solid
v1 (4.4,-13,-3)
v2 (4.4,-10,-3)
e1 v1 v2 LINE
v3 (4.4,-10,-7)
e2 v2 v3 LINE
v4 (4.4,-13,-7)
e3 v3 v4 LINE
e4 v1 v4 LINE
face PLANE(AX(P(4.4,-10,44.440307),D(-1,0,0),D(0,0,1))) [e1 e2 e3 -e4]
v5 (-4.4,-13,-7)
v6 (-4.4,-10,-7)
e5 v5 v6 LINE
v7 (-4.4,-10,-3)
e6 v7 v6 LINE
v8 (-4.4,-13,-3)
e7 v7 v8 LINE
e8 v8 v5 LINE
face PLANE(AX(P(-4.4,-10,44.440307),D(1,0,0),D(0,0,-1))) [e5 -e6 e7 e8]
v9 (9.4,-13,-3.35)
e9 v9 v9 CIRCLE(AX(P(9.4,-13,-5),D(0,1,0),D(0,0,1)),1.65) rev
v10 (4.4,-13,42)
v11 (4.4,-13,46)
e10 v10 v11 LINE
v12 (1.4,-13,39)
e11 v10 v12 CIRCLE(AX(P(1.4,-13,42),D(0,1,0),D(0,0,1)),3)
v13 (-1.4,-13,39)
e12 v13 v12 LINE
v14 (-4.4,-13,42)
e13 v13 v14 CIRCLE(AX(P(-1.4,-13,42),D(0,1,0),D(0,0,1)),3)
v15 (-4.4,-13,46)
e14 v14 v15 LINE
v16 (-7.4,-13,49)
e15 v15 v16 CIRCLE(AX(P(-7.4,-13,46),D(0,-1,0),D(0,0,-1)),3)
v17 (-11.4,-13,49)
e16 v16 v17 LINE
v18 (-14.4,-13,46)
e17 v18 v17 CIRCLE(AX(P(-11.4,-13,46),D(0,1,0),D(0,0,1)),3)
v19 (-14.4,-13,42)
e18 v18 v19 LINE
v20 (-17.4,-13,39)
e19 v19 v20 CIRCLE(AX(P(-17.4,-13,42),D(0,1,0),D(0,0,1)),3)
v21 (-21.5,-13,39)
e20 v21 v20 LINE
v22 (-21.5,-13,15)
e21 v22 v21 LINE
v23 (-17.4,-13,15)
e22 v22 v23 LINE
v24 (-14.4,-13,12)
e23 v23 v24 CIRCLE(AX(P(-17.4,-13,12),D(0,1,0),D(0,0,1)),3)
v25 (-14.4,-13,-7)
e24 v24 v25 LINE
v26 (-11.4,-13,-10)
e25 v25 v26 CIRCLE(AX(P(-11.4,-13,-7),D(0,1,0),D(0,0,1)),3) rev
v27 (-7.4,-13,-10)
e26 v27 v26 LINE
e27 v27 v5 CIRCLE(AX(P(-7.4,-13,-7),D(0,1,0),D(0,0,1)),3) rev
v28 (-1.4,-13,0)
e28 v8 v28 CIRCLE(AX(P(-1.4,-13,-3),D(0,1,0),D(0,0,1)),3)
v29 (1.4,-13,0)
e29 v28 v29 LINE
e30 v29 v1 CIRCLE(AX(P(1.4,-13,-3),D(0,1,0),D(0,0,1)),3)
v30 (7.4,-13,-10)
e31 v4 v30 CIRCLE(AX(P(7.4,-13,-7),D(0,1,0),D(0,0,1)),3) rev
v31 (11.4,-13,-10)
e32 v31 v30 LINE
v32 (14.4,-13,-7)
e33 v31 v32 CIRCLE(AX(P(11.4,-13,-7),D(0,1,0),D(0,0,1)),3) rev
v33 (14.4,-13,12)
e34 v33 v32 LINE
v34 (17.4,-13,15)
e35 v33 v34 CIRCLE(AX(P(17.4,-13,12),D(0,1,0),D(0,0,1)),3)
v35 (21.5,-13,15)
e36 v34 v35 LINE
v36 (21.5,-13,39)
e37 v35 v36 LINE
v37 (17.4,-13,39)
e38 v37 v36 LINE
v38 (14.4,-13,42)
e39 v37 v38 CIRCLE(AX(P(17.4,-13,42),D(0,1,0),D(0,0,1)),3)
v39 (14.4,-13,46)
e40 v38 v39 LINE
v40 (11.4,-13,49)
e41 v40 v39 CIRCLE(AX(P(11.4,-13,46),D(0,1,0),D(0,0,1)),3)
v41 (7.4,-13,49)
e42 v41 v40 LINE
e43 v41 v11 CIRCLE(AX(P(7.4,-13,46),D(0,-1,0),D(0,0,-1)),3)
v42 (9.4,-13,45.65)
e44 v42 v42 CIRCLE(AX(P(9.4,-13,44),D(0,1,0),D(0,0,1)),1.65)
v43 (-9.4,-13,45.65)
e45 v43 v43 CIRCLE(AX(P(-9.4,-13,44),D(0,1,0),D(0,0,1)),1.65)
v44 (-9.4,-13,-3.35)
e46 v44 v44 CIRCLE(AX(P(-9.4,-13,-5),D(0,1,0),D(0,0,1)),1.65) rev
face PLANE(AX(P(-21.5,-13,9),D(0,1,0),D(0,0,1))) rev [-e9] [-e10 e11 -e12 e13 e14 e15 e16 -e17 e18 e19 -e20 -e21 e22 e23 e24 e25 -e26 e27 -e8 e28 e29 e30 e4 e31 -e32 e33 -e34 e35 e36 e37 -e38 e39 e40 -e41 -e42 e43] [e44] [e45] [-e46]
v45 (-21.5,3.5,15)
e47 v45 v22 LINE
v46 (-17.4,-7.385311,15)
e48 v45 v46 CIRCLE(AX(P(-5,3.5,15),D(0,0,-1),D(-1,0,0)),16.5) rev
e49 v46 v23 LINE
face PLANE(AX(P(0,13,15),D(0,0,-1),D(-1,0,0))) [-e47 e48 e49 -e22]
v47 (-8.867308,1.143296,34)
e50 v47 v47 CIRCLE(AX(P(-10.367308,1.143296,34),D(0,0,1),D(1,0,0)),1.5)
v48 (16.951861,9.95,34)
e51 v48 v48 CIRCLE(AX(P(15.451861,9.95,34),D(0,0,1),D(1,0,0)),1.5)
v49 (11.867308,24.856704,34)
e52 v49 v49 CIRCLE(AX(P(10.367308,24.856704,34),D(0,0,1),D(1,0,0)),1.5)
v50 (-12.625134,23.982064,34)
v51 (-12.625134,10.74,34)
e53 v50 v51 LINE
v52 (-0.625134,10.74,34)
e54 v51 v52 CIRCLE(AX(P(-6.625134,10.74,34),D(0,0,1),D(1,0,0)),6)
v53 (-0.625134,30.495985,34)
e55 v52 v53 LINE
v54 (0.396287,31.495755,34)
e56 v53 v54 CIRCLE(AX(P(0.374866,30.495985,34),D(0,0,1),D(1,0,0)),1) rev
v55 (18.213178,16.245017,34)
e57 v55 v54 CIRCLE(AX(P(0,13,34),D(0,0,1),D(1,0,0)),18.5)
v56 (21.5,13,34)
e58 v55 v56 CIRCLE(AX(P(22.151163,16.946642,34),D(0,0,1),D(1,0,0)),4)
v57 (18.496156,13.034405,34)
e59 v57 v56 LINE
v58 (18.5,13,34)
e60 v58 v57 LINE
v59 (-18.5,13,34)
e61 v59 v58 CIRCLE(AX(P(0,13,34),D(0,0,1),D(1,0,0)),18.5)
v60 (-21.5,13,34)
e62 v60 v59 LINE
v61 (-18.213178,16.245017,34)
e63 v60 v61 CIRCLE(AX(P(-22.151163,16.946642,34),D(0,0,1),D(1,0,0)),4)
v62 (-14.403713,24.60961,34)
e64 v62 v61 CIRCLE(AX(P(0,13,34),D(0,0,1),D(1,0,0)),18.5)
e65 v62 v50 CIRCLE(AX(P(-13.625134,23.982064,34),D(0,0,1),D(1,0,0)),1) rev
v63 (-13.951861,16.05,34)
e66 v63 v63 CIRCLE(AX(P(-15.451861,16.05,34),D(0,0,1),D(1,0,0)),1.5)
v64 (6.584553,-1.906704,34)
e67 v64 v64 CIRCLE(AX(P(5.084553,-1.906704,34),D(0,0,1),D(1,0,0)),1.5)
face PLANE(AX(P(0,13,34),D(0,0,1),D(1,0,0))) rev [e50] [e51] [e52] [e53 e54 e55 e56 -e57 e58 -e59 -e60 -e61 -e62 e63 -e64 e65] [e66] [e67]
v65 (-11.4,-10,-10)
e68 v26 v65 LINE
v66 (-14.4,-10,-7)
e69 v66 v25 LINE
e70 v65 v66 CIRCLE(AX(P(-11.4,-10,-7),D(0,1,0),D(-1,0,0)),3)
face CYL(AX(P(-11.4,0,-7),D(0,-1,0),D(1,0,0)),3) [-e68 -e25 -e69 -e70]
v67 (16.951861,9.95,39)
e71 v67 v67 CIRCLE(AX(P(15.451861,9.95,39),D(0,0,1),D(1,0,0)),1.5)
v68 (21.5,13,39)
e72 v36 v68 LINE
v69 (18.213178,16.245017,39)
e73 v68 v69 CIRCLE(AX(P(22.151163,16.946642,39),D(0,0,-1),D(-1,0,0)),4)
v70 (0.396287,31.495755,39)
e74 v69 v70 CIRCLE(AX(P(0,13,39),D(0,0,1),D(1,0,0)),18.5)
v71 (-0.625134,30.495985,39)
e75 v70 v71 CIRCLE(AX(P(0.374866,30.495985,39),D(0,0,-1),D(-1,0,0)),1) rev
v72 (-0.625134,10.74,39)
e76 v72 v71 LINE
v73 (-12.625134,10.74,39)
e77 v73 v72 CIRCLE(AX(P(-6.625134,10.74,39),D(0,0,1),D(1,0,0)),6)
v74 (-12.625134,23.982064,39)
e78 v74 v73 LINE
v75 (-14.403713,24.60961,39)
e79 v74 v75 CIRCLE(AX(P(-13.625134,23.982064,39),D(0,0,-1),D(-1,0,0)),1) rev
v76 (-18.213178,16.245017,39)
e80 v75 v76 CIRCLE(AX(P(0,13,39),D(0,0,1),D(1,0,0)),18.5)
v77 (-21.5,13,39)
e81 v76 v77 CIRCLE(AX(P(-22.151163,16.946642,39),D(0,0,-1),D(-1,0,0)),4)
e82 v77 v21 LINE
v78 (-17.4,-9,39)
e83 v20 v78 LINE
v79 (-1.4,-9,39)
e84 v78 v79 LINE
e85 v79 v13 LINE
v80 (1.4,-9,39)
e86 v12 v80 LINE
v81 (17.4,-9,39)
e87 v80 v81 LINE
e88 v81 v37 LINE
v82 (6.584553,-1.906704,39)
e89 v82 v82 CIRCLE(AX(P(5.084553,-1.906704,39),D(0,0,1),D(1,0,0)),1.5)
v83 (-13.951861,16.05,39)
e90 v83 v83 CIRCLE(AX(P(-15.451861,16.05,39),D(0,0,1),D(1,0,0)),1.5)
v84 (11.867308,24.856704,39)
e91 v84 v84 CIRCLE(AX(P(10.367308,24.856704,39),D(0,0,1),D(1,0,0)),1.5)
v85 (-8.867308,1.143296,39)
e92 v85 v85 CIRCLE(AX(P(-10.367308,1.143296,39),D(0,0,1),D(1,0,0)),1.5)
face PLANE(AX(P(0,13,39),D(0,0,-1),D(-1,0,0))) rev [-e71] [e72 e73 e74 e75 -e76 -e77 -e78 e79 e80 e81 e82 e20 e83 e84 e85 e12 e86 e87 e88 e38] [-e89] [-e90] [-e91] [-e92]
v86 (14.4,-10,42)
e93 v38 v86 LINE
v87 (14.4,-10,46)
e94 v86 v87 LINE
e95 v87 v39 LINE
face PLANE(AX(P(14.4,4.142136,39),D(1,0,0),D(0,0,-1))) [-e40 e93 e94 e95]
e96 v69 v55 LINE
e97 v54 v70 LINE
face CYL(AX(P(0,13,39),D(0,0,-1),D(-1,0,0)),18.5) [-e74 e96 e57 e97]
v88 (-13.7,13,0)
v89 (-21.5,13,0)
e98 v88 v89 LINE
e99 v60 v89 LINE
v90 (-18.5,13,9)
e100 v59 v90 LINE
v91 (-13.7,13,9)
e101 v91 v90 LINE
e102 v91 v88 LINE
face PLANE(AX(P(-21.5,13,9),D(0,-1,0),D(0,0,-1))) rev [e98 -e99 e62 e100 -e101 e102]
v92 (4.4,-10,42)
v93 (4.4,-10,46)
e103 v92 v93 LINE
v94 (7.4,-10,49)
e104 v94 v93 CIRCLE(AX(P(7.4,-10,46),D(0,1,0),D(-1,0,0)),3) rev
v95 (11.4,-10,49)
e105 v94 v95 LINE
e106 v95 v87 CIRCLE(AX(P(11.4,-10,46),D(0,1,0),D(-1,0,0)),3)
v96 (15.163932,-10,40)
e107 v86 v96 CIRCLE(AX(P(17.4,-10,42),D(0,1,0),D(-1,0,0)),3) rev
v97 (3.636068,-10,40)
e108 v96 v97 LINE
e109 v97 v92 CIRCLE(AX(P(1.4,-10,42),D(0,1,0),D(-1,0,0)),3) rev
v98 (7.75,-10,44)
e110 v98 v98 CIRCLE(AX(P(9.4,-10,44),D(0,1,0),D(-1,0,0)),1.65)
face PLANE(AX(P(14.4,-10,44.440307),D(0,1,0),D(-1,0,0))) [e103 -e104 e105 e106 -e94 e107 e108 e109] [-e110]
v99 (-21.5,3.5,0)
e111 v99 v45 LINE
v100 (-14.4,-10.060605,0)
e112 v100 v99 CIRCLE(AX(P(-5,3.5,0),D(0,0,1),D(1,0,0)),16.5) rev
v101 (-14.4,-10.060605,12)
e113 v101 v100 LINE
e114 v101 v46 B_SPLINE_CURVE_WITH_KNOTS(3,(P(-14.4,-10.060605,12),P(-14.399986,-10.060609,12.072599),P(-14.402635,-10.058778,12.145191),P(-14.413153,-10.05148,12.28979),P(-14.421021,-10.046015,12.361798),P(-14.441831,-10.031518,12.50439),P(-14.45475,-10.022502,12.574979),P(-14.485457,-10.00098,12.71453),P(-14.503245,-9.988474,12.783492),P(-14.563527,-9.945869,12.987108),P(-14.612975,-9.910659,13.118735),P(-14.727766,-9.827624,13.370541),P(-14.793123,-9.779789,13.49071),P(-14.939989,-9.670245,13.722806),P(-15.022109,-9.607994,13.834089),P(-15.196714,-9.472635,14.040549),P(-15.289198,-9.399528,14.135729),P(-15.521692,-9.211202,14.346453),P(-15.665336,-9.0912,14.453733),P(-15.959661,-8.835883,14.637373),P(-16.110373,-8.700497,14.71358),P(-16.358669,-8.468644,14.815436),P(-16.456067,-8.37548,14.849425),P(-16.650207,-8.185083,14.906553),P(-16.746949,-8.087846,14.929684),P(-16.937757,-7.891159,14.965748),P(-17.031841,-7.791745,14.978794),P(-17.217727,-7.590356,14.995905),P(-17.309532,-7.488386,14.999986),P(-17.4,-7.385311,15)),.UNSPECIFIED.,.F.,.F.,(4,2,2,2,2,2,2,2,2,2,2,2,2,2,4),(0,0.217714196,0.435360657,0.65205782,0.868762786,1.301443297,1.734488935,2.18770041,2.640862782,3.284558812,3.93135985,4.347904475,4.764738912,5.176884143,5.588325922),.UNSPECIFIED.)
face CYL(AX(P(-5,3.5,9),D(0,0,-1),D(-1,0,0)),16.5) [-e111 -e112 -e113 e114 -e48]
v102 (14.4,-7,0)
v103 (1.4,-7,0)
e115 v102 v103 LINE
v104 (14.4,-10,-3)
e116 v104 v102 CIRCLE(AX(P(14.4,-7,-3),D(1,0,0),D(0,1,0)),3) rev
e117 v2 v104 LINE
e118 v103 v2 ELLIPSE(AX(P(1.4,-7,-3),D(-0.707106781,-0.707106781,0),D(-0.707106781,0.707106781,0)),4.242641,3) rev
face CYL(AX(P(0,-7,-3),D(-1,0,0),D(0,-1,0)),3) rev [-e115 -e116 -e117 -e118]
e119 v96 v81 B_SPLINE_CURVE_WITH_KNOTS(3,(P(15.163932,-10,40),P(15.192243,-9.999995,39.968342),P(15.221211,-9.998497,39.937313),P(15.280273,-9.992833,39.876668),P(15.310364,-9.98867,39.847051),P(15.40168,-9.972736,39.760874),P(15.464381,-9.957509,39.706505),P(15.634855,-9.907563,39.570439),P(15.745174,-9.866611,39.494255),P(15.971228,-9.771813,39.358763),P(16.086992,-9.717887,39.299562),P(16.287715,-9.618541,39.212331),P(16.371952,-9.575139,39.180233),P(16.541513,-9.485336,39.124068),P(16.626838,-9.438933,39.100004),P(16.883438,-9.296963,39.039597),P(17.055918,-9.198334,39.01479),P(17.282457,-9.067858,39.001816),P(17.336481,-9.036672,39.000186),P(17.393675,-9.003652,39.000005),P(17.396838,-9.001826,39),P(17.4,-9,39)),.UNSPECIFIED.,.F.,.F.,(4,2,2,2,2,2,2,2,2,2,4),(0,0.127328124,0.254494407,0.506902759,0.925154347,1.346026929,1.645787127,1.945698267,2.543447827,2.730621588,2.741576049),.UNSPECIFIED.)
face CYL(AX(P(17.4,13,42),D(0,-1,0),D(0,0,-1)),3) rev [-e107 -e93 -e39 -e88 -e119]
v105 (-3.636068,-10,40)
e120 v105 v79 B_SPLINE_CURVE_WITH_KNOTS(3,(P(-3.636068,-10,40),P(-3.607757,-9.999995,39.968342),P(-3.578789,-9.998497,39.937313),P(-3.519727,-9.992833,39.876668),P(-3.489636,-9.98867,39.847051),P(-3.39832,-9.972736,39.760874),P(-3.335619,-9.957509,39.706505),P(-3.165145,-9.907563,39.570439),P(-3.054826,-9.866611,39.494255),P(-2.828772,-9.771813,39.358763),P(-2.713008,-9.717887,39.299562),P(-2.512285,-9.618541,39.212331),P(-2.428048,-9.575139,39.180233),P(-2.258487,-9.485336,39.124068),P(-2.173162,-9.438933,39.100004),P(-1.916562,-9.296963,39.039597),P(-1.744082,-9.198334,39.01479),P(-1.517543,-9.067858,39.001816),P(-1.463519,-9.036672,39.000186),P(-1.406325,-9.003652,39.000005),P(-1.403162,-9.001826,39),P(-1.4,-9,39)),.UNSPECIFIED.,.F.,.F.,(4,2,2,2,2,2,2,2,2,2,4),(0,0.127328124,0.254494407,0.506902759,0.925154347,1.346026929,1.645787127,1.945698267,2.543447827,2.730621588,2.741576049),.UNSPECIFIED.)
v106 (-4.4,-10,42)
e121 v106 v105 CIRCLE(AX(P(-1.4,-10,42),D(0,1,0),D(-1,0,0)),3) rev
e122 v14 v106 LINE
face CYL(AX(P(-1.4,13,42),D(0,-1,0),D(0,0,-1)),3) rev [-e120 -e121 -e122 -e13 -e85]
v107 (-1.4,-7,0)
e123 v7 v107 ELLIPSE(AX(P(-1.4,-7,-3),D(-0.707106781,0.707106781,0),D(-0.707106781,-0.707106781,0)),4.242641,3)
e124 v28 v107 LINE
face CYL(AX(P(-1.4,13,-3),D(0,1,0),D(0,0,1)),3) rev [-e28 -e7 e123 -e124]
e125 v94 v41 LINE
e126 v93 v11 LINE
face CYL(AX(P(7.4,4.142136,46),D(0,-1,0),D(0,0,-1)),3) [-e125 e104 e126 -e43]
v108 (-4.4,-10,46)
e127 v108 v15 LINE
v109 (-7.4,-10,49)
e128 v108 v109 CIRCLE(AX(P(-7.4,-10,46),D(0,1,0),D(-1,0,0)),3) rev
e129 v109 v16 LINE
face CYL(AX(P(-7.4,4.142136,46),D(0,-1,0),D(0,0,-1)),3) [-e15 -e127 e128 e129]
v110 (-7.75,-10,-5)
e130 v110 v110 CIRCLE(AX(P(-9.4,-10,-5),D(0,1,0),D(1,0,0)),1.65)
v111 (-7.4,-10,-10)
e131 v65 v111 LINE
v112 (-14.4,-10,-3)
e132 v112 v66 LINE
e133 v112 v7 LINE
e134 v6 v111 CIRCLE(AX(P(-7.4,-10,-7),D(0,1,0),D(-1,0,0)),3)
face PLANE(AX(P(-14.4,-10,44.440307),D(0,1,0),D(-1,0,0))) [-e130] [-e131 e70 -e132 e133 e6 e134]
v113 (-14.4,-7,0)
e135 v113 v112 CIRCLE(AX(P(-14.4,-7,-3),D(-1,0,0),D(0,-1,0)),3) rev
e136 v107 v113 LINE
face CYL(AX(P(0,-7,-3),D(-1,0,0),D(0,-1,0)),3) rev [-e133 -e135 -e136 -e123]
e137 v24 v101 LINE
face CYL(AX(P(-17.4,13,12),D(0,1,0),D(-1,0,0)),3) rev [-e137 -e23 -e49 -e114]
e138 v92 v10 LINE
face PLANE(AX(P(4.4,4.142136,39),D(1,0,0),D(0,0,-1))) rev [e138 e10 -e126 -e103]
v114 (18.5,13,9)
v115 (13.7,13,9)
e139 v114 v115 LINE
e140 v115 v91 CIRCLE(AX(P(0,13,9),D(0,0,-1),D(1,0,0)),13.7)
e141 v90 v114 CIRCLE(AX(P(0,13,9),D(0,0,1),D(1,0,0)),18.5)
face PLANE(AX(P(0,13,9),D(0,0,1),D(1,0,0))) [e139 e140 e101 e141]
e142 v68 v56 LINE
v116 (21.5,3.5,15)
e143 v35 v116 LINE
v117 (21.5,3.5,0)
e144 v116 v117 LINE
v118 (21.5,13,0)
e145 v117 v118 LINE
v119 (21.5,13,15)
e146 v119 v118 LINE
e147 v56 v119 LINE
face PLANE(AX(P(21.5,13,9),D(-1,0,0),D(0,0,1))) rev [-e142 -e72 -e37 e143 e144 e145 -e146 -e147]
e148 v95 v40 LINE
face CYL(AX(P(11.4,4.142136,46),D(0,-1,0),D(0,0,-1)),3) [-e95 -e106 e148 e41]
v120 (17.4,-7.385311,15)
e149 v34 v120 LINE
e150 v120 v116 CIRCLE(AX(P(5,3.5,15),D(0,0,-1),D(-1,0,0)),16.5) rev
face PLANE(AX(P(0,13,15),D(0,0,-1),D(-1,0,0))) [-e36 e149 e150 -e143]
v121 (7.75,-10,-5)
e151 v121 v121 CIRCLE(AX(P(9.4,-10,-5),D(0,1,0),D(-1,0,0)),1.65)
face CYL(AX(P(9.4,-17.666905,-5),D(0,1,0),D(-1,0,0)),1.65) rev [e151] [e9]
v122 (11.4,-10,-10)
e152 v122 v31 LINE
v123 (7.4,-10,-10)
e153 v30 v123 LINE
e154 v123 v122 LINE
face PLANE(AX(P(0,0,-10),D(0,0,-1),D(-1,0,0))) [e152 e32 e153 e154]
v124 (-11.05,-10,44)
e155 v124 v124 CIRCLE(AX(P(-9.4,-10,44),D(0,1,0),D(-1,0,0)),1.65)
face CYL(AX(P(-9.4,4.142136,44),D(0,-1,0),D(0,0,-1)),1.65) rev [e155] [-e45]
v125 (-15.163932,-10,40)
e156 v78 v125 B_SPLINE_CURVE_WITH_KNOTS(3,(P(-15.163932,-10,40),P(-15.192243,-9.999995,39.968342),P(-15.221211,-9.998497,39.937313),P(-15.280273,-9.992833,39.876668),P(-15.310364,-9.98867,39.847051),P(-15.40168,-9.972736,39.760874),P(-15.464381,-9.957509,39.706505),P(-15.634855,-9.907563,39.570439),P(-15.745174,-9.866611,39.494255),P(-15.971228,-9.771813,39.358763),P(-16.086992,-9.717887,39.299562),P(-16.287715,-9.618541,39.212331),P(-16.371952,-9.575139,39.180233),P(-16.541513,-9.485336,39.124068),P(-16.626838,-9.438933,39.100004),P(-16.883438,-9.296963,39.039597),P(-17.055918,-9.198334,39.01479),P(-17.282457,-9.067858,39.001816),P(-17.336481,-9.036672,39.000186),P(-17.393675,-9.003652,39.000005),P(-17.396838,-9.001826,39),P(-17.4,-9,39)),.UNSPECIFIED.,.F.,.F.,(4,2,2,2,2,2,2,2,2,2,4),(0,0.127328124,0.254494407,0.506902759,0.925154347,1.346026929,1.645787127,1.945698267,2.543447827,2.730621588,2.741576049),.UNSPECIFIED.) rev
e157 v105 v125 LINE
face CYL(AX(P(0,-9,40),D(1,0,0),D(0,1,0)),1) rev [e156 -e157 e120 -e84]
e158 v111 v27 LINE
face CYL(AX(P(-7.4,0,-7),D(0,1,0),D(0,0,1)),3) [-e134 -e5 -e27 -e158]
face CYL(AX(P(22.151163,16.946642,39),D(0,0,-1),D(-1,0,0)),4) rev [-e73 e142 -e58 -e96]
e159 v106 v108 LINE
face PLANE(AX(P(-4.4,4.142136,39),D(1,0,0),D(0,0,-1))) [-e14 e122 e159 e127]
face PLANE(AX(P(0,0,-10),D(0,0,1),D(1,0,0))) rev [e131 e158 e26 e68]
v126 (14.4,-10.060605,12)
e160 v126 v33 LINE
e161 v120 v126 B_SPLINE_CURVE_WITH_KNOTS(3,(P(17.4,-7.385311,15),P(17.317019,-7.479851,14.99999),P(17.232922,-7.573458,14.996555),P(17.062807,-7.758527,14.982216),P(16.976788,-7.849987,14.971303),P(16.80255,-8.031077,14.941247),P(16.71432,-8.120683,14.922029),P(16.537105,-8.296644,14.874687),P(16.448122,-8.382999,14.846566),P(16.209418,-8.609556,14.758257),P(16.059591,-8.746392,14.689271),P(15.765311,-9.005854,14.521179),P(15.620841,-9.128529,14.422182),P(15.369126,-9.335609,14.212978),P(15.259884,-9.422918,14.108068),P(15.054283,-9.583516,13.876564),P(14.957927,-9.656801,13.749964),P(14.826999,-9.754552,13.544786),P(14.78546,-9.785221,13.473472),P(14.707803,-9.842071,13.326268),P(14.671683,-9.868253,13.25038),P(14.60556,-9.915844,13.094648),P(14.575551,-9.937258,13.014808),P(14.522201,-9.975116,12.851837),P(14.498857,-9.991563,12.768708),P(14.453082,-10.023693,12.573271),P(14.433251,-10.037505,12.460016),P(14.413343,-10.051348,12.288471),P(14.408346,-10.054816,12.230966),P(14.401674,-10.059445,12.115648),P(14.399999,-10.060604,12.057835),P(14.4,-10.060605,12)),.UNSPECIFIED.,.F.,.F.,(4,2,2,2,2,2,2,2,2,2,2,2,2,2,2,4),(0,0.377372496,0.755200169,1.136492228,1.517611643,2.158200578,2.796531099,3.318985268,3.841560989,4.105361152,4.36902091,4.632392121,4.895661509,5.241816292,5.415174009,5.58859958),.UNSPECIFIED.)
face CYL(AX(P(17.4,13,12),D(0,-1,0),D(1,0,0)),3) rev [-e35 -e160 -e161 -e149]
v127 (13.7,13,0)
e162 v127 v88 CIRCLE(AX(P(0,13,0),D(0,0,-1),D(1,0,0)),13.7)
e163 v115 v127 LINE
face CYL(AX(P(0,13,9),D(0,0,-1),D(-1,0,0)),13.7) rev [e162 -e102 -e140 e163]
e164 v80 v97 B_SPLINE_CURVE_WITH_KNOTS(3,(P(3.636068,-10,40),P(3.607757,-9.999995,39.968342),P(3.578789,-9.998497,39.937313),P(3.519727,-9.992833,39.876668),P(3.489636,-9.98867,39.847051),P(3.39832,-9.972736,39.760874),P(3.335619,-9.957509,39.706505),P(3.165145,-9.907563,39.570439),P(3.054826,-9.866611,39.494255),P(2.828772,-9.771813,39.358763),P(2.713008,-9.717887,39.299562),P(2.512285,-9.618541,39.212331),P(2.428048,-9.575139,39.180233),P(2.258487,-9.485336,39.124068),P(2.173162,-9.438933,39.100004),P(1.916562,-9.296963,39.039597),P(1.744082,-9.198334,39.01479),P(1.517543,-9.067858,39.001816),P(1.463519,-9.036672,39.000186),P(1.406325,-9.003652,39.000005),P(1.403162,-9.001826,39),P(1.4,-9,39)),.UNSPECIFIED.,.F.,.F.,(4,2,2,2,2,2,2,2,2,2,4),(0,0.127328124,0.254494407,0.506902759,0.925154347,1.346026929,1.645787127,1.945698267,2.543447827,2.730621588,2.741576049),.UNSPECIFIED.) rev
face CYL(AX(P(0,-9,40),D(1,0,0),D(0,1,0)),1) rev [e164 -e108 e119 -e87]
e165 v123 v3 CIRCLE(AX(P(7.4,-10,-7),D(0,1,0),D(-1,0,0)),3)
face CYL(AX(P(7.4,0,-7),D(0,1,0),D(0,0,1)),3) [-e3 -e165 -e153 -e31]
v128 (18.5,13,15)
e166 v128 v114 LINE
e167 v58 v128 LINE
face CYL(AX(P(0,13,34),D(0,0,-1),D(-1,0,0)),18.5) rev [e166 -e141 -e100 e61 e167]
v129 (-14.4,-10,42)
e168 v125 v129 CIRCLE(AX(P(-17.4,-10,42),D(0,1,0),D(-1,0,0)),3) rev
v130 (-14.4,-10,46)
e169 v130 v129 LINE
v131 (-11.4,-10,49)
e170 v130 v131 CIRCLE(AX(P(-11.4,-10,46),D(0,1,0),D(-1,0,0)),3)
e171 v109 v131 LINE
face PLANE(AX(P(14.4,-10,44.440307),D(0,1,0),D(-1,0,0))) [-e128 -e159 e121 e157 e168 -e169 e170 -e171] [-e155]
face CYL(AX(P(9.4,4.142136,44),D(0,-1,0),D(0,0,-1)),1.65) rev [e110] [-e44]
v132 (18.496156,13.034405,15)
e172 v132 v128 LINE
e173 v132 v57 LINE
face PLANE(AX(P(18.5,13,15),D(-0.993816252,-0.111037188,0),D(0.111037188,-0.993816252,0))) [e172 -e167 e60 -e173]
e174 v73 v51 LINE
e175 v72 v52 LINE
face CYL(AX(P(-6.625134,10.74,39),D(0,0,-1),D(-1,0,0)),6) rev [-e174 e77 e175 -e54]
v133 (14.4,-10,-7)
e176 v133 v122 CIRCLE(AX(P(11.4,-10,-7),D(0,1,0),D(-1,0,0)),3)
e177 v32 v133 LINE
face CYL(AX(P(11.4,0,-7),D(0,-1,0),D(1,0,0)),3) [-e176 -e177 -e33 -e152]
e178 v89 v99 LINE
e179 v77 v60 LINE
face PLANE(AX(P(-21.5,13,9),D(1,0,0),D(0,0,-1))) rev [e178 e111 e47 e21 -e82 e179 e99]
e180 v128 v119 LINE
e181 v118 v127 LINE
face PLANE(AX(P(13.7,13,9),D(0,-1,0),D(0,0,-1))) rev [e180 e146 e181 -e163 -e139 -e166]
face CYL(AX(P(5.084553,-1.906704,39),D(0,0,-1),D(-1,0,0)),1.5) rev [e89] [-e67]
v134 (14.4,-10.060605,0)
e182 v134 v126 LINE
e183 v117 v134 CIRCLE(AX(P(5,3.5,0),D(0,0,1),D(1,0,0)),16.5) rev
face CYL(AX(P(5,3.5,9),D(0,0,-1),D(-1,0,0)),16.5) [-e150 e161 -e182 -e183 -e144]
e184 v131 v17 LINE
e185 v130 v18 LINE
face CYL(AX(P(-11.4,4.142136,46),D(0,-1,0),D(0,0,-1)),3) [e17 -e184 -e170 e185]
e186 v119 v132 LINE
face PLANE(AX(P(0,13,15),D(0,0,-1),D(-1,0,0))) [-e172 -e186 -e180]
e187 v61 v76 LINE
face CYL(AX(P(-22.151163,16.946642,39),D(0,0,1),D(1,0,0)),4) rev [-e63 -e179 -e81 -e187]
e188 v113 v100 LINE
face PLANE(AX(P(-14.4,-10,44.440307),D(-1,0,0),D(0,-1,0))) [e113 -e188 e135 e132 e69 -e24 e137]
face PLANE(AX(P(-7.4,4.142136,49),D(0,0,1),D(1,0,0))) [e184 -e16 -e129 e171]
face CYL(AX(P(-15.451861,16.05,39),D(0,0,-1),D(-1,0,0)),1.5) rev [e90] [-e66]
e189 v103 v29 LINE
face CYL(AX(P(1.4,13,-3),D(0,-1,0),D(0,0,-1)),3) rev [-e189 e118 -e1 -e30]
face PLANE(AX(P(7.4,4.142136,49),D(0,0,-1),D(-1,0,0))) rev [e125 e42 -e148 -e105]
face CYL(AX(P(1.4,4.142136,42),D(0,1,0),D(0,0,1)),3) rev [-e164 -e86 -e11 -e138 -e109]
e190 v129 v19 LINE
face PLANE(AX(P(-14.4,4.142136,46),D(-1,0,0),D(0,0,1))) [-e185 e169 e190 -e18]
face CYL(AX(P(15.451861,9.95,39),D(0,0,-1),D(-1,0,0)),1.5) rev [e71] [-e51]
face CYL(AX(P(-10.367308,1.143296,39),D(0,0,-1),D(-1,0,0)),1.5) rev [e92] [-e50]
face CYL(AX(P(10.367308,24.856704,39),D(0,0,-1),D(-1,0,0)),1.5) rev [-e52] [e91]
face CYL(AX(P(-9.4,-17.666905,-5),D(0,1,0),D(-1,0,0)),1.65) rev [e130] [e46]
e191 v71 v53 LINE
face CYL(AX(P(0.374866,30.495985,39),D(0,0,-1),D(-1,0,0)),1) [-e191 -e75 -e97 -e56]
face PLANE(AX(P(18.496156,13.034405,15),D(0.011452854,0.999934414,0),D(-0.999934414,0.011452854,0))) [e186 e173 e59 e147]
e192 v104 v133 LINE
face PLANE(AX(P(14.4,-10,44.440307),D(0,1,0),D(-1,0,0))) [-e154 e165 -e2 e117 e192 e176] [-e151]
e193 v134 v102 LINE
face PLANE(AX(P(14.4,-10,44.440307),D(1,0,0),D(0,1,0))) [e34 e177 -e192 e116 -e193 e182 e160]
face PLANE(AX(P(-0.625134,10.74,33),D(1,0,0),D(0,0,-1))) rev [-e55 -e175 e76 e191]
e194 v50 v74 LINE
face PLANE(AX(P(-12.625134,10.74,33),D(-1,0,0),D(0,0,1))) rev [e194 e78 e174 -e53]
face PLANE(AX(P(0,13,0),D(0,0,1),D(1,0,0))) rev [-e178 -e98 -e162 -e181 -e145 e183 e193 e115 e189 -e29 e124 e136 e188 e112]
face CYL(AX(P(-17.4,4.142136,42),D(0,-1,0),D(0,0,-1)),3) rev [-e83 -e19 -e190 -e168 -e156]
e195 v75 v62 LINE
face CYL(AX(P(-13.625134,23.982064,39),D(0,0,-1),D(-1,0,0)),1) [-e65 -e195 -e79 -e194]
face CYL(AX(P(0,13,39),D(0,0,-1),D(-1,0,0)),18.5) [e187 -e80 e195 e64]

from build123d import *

# Parameters (mm, degrees)
BOSS_EXTRUDE1_DEPTH      = 9
BOSS_EXTRUDE2_DEPTH      = 25
FILLET1_R                = 16.5
BOSS_EXTRUDE3_START      = -34
SKETCH4_W                = 10
SKETCH4_H                = 3
BOSS_EXTRUDE3_DEPTH      = 44
SKETCH5_R                = 1.65
CUT_EXTRUDE1_DEPTH       = 3
FILLET2_R                = 3
SKETCH12_R               = 18.5
SKETCH12_R_2             = 1.5
SKETCH12_R_3             = 6
BOSS_EXTRUDE8_DEPTH      = 5
BOSS_EXTRUDE9_DEPTH      = 5
BOSS_EXTRUDE9_DEPTH_BACK = 19
SKETCH14_R               = 1.65
BOSS_EXTRUDE11_DEPTH     = 3
CUT_EXTRUDE2_START       = -6
CUT_EXTRUDE2_DEPTH       = 6
FILLET4_R                = 1
FILLET5_START            = -13
FILLET5_DEPTH            = 6
FILLET5_2_DEPTH          = 4
FILLET5_START_2          = -18
FILLET5_3_DEPTH          = 36
FILLET6_R                = 4


with BuildPart() as part:
    # Sketch1 → Boss-Extrude1 (new body)
    with BuildSketch(Plane.XY):
        with BuildLine():
            Line((13.7, 13), (21.5, 13))
            Line((21.5, 13), (21.5, -13))
            Line((21.5, -13), (-21.5, -13))
            Line((-21.5, -13), (-21.5, 13))
            Line((-21.5, 13), (-13.7, 13))
            ThreePointArc((-13.7, 13), (0, -0.7), (13.7, 13))
        make_face()
    extrude(amount=BOSS_EXTRUDE1_DEPTH)

    # Sketch2 → Boss-Extrude2 (add)
    with BuildSketch(Plane.XY.offset(9)):
        with BuildLine():
            Line((18.5, 13), (21.5, 13))
            Line((21.5, 13), (21.5, -13))
            Line((21.5, -13), (-21.5, -13))
            Line((-21.5, -13), (-21.5, 13))
            Line((-21.5, 13), (-18.5, 13))
            ThreePointArc((-18.5, 13), (0, -5.5), (18.5, 13))
        make_face()
    extrude(amount=BOSS_EXTRUDE2_DEPTH)

    # Fillet1
    fillet1_edges = [part.edges().sort_by_distance(p)[0] for p in [
        (21.5, -13, 17),
        (-21.5, -13, 17),
    ]]
    fillet(fillet1_edges, radius=FILLET1_R)

    # Sketch4 → Boss-Extrude3 (add)
    with BuildSketch(Plane(origin=(0, 0, 0), x_dir=(-1, 0, 0), z_dir=(0, 0, -1)).offset(BOSS_EXTRUDE3_START)):
        with Locations((-9.4, -11.5)):
            Rectangle(SKETCH4_W, SKETCH4_H)
        with Locations((9.4, -11.5)):
            Rectangle(SKETCH4_W, SKETCH4_H)
    extrude(amount=BOSS_EXTRUDE3_DEPTH)

    # Sketch5 → Cut-Extrude1 (cut)
    with BuildSketch(Plane(origin=(0, -10, 0), x_dir=(1, 0, 0), z_dir=(0, 1, 0))):
        with Locations(Location((9.4, 5, 0), (0, 0, 180))):
            Circle(SKETCH5_R)
        with Locations(Location((-9.4, 5, 0), (0, 0, 270))):
            Circle(SKETCH5_R)
    extrude(amount=-CUT_EXTRUDE1_DEPTH, mode=Mode.SUBTRACT)

    # Fillet2
    fillet2_edges = [part.edges().sort_by_distance(p)[0] for p in [
        (4.4, -11.5, 0),
        (9.4, -10, 0),
        (14.4, -11.5, -10),
        (4.4, -11.5, -10),
        (-9.4, -10, 0),
        (-4.4, -11.5, 0),
        (-14.4, -11.5, -10),
        (-4.4, -11.5, -10),
    ]]
    fillet(fillet2_edges, radius=FILLET2_R)



with BuildPart() as body_2:
    # Sketch12 → Boss-Extrude8 (new body)
    with BuildSketch(Plane.XY.offset(34)):
        with Locations((0, 13)):
            Circle(SKETCH12_R)
        with Locations((-15.451860729, 16.05)):
            Circle(SKETCH12_R_2, mode=Mode.SUBTRACT)
        with Locations((-5.084552883, 27.906703927)):
            Circle(SKETCH12_R_2, mode=Mode.SUBTRACT)
        with Locations((10.367307846, 24.856703927)):
            Circle(SKETCH12_R_2, mode=Mode.SUBTRACT)
        with Locations((15.451860729, 9.95)):
            Circle(SKETCH12_R_2, mode=Mode.SUBTRACT)
        with Locations((5.084552883, -1.906703927)):
            Circle(SKETCH12_R_2, mode=Mode.SUBTRACT)
        with Locations((-10.367307846, 1.143296073)):
            Circle(SKETCH12_R_2, mode=Mode.SUBTRACT)
        with Locations((-6.625133961, 10.74)):
            Circle(SKETCH12_R_3, mode=Mode.SUBTRACT)
    extrude(amount=BOSS_EXTRUDE8_DEPTH)


with BuildPart() as part_1:
    add(part.part)

    add(body_2.part)  # Boss-Extrude9 merges body 2
    # Sketch13 → Boss-Extrude9 (add, two sides: drawn at the far end of the back side and taken through both)
    with BuildSketch(Plane.XY.offset(34).offset(-BOSS_EXTRUDE9_DEPTH_BACK)):
        with BuildLine():
            Line((-21.5, 13), (-21.5, -13))
            Line((-21.5, -13), (21.5, -13))
            Line((21.5, -13), (21.5, 13))
            Line((21.5, 13), (18.496156013, 13.034404843))
            Line((18.496156013, 13.034404843), (18.5, 13))
            ThreePointArc((18.5, 13), (0, -5.5), (-18.5, 13))
            Line((-18.5, 13), (-21.5, 13))
        make_face()
    extrude(amount=BOSS_EXTRUDE9_DEPTH + BOSS_EXTRUDE9_DEPTH_BACK)

    # Sketch14 → Boss-Extrude11 (add)
    # profile 1 of 2: a face of its own
    with BuildSketch(Plane.XZ.offset(13)):
        with BuildLine():
            Line((7.4, 49), (11.4, 49))
            ThreePointArc((11.4, 49), (13.521320344, 48.121320344), (14.4, 46))
            Line((14.4, 46), (14.4, 39))
            Line((14.4, 39), (4.4, 39))
            Line((4.4, 39), (4.4, 46))
            ThreePointArc((4.4, 46), (5.278679656, 48.121320344), (7.4, 49))
        make_face()
        with Locations(Location((9.4, 44, 0), (0, 0, 180))):
            Circle(SKETCH14_R, mode=Mode.SUBTRACT)
    # profile 2 of 2: a face of its own
    with BuildSketch(Plane.XZ.offset(13)):
        with BuildLine():
            Line((-7.4, 49), (-11.4, 49))
            ThreePointArc((-11.4, 49), (-13.521320344, 48.121320344), (-14.4, 46))
            Line((-14.4, 46), (-14.4, 39))
            Line((-14.4, 39), (-4.4, 39))
            Line((-4.4, 39), (-4.4, 46))
            ThreePointArc((-4.4, 46), (-5.278679656, 48.121320344), (-7.4, 49))
        make_face()
        with Locations(Location((-9.4, 44, 0), (0, 0, 180))):
            Circle(SKETCH14_R, mode=Mode.SUBTRACT)
    extrude(amount=-BOSS_EXTRUDE11_DEPTH)

    # Sketch15 → Cut-Extrude2 (cut)
    with BuildSketch(Plane.XY.offset(39).offset(CUT_EXTRUDE2_START)):
        with BuildLine():
            Line((-12.625133961, 10.74), (-12.625133961, 26.522425539))
            ThreePointArc((-12.625133961, 26.522425539), (-7.075323018, 30.093560314), (-0.625133961, 31.489435025))
            Line((-0.625133961, 31.489435025), (-0.625133961, 10.74))
            ThreePointArc((-0.625133961, 10.74), (-6.625133961, 4.74), (-12.625133961, 10.74))
        make_face()
    extrude(amount=CUT_EXTRUDE2_DEPTH, mode=Mode.SUBTRACT)

    # Fillet4
    fillet4_edges = [part_1.edges().sort_by_distance(p)[0] for p in [
        (-9.4, -10, 39),
        (9.4, -10, 39),
        (-12.625133961, 26.522425539, 36.5),
        (-0.625133961, 31.489435025, 36.5),
    ]]
    fillet(fillet4_edges, radius=FILLET4_R)

    # Fillet5: read off the stored shape, not the designer's step
    # Fillet5 outline → Fillet5 (add)
    with BuildSketch(Plane(origin=(0, 0, 0), x_dir=(1, 0, 0), z_dir=(0, 1, 0)).offset(FILLET5_START)):
        with BuildLine():
            ThreePointArc((-14.4, -12), (-15.278679656, -14.121320344), (-17.4, -15))
            Line((-17.4, -15), (-14.4, -15))
            Line((-14.4, -15), (-14.4, -12))
        make_face()
        with BuildLine():
            Line((14.4, -15), (17.4, -15))
            ThreePointArc((17.4, -15), (15.278679656, -14.121320344), (14.4, -12))
            Line((14.4, -12), (14.4, -15))
        make_face()
    extrude(amount=FILLET5_DEPTH)

    # Fillet5 2 outline → Fillet5 2 (add)
    with BuildSketch(Plane(origin=(0, 0, 0), x_dir=(1, 0, 0), z_dir=(0, 1, 0)).offset(FILLET5_START)):
        with BuildLine():
            Line((14.4, -39), (14.4, -42))
            ThreePointArc((14.4, -42), (15.278679656, -39.878679656), (17.4, -39))
            Line((17.4, -39), (14.4, -39))
        make_face()
        with BuildLine():
            Line((-14.4, -42), (-14.4, -39))
            Line((-14.4, -39), (-17.4, -39))
            ThreePointArc((-17.4, -39), (-15.278679656, -39.878679656), (-14.4, -42))
        make_face()
        with BuildLine():
            ThreePointArc((-4.4, -42), (-3.521320344, -39.878679656), (-1.4, -39))
            Line((-1.4, -39), (-4.4, -39))
            Line((-4.4, -39), (-4.4, -42))
        make_face()
        with BuildLine():
            Line((4.4, -42), (4.4, -39))
            Line((4.4, -39), (1.4, -39))
            ThreePointArc((1.4, -39), (3.521320344, -39.878679656), (4.4, -42))
        make_face()
    extrude(amount=FILLET5_2_DEPTH)

    # Fillet5 3 outline → Fillet5 3 (cut)
    with BuildSketch(Plane.YZ.offset(FILLET5_START_2)):
        with BuildLine():
            Line((-9, 42), (-10, 42))
            Line((-10, 42), (-10, 40))
            ThreePointArc((-10, 40), (-9.707106781, 39.292893219), (-9, 39))
            Line((-9, 39), (-9, 42))
        make_face()
    extrude(amount=FILLET5_3_DEPTH, mode=Mode.SUBTRACT)

    # Fillet6
    # the kernel refuses this fillet: 4 mm, written as the material it adds along each edge
    with BuildSketch(Plane(origin=(-18.5, 13, 39), x_dir=(-1, 0, 0), z_dir=(0, 0, -1))) as fillet6_piece_1:
        with BuildLine():
            CenterArc((3.651162791, 3.9466425), FILLET6_R, 190.102305056, 70.528779366)
            ThreePointArc((-0.286821705, 3.245017166), (-0.071844932, 1.628834177), (0, 0))
            Line((0, 0), (3, 0))
        make_face()
    extrude(amount=5)
    with BuildSketch(Plane(origin=(18.499968089, 13.034361181, 39), x_dir=(-0.08897012709688518, 0.996034294833448, 0), z_dir=(0, 0, -1))) as fillet6_piece_2:
        with BuildLine():
            CenterArc((3.571919108, 3.984791306), FILLET6_R, 194.473277614, 70.528779366)
            Line((-0.301138135, 2.98507755), (0, 0))
            ThreePointArc((0, 0), (1.611719597, 0.070340211), (3.223439195, 0))
        make_face()
    extrude(amount=5)


solid = part_1.part
